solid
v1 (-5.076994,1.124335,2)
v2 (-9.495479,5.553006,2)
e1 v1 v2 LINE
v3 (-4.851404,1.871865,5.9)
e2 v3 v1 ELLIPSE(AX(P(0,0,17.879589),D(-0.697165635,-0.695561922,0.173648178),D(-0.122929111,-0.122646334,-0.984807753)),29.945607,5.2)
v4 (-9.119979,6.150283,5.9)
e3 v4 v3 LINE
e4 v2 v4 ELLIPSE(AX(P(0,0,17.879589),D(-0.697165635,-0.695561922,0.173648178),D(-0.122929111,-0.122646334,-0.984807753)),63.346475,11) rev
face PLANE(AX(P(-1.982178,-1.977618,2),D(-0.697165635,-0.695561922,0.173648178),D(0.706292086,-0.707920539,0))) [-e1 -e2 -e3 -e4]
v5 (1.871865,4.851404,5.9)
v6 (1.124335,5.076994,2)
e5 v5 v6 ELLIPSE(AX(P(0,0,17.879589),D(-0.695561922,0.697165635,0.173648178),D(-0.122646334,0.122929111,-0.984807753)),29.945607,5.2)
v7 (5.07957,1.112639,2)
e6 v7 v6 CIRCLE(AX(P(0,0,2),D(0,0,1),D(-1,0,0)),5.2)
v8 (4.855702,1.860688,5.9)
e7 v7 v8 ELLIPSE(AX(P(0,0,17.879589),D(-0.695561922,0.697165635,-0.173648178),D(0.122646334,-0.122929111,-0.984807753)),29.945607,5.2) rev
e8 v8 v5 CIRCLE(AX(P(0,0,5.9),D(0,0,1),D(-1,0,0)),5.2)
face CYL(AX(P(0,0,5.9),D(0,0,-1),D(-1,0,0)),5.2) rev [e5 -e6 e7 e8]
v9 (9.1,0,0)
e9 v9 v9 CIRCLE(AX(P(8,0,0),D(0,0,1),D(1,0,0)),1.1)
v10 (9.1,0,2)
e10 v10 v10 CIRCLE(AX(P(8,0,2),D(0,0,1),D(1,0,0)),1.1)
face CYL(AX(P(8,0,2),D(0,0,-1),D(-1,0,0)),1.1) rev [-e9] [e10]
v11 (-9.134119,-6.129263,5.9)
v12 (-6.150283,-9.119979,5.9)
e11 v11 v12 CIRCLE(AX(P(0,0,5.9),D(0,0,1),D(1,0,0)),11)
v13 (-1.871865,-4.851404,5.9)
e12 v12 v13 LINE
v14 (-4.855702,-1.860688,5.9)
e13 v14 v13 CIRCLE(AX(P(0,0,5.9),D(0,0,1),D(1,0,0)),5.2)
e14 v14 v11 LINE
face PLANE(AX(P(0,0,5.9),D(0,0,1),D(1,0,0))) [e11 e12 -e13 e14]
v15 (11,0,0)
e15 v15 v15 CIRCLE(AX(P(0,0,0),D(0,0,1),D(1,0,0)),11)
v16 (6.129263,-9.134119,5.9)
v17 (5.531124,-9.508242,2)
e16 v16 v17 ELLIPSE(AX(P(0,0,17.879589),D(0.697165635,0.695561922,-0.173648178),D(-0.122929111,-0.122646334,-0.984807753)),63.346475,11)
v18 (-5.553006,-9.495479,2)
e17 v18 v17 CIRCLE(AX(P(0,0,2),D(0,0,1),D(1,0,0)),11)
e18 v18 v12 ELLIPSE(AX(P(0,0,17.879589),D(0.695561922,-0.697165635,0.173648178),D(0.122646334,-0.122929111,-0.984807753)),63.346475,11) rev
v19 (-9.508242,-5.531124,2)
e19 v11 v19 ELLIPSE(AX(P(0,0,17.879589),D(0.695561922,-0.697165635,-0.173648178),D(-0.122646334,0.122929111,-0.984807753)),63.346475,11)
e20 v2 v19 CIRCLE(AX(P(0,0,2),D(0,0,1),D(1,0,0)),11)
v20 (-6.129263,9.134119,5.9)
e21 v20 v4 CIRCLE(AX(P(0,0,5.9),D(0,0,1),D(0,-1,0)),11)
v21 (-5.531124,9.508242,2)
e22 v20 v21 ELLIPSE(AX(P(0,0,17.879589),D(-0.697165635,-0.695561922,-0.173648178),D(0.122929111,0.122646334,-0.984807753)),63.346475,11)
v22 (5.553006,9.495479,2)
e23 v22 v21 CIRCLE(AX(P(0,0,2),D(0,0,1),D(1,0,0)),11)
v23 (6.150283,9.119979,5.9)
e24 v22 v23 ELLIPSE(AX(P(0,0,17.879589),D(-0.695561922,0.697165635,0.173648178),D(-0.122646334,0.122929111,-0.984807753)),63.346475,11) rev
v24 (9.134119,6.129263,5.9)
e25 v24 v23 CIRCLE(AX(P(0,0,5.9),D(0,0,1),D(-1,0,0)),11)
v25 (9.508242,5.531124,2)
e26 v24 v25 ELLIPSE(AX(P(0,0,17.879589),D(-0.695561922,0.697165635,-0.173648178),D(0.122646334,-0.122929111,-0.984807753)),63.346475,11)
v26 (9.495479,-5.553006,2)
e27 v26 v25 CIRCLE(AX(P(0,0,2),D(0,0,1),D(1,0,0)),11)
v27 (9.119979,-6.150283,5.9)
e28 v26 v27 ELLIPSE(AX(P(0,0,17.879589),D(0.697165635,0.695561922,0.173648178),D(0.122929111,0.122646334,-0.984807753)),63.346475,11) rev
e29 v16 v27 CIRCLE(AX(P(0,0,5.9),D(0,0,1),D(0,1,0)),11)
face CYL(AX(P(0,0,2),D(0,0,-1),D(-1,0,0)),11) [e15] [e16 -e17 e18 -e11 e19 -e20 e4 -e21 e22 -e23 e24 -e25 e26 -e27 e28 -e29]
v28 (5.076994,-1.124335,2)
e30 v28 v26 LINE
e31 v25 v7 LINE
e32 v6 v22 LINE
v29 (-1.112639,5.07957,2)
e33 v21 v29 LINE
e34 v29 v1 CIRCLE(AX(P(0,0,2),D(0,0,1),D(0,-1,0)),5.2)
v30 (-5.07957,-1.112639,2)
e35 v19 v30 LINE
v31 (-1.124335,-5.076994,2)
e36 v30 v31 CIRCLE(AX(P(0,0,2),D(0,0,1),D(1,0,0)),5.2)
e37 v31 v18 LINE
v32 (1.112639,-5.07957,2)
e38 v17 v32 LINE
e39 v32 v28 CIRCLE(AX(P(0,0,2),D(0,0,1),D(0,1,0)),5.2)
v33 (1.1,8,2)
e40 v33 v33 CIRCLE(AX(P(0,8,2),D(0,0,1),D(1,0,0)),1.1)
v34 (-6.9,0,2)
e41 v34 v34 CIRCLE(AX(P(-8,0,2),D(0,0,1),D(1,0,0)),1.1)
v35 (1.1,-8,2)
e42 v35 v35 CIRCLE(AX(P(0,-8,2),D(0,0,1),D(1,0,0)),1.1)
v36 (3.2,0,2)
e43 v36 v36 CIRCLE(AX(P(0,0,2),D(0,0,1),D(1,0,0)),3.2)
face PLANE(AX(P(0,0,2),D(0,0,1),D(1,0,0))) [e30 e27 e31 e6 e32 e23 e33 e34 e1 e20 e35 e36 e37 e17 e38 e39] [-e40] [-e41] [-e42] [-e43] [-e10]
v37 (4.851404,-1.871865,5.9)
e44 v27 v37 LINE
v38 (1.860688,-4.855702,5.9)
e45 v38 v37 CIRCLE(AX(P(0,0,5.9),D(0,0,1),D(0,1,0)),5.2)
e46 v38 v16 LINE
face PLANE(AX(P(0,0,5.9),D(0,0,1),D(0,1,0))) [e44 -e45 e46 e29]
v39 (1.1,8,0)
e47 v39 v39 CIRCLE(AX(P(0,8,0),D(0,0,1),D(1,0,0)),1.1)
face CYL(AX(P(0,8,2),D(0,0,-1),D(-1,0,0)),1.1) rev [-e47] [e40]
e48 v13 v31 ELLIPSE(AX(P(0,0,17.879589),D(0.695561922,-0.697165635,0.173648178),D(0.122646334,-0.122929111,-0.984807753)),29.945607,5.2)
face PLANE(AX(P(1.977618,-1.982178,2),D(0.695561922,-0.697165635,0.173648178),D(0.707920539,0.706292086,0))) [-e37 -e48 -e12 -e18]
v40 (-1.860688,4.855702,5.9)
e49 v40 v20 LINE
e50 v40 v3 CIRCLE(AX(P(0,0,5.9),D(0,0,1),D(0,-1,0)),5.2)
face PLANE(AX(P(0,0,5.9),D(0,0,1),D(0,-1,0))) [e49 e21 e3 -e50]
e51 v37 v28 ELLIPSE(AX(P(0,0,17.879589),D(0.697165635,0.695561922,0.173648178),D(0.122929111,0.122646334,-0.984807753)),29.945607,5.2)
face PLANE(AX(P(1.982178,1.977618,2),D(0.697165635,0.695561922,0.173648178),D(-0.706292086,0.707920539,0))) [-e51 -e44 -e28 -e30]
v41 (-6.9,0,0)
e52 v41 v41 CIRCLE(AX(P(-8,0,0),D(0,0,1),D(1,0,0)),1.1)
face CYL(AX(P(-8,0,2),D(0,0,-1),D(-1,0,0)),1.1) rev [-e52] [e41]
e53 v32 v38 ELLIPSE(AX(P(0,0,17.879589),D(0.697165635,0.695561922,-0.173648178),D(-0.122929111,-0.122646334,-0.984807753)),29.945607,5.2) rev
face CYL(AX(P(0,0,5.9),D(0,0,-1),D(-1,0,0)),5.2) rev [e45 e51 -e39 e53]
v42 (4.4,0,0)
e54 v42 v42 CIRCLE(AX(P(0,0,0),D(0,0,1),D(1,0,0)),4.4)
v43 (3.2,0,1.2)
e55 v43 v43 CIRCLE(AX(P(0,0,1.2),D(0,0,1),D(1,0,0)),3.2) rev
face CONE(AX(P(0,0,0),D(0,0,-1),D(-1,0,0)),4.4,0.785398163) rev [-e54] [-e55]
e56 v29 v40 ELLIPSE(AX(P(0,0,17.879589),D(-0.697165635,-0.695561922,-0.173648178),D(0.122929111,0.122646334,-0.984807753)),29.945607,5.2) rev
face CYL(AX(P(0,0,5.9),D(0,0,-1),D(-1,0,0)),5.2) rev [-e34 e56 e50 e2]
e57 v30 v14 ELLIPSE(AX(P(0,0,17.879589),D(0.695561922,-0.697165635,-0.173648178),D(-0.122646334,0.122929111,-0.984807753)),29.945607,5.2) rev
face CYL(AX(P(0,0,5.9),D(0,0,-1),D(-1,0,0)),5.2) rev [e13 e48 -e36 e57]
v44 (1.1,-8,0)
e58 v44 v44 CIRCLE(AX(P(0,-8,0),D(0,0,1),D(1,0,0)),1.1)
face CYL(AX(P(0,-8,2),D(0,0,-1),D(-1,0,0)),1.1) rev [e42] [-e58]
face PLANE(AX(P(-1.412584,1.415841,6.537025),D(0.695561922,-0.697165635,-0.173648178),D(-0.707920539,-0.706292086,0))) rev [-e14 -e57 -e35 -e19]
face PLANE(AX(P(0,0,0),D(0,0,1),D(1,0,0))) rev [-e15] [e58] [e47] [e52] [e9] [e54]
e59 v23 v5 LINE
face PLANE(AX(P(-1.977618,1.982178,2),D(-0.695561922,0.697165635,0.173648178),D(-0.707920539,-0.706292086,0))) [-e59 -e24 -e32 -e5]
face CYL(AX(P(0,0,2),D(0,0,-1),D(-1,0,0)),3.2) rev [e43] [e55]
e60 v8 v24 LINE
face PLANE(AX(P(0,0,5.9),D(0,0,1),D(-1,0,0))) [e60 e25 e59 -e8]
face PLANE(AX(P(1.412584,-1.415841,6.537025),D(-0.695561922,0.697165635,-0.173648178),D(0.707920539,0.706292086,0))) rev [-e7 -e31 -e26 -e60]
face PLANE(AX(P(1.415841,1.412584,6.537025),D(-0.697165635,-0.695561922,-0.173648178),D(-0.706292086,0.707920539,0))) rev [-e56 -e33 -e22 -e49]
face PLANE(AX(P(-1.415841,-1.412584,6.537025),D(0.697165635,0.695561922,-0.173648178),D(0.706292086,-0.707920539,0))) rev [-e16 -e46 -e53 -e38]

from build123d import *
from build123d.topology import SkipClean

# Parameters (mm, degrees)
SZKIC1_R                    = 11
SZKIC1_R_2                  = 1.1
SZKIC1_R_3                  = 3.2
DODANIE_WYCI_GNI_CIE1_DEPTH = 2
SFAZOWANIE1_SIZE            = 1.2
DODANIE_WYCI_GNI_CIE2_DEPTH = 3.9
SZYK_KO_OWY1_COUNT          = 4


with BuildPart() as part:
    # Szkic1 → Dodanie-wyciągnięcie1 (new body)
    with BuildSketch(Plane.XY):
        Circle(SZKIC1_R)
        with Locations((0, 8)):
            Circle(SZKIC1_R_2, mode=Mode.SUBTRACT)
        with Locations((8, 0)):
            Circle(SZKIC1_R_2, mode=Mode.SUBTRACT)
        with Locations((0, -8)):
            Circle(SZKIC1_R_2, mode=Mode.SUBTRACT)
        with Locations((-8, 0)):
            Circle(SZKIC1_R_2, mode=Mode.SUBTRACT)
        Circle(SZKIC1_R_3, mode=Mode.SUBTRACT)
    extrude(amount=DODANIE_WYCI_GNI_CIE1_DEPTH)

    # Sfazowanie1
    sfazowanie1_edges = [part.edges().sort_by_distance(p)[0] for p in [
        (-3.2, 0, 0),
    ]]
    chamfer(sfazowanie1_edges, length=SFAZOWANIE1_SIZE)

    # Szkic2 → Dodanie-wyciągnięcie2 (add)
    with BuildSketch(Plane.XY.offset(2)):
        with BuildLine():
            ThreePointArc((-1.985434, -4.806043), (-3.681187, -3.672719), (-4.810603, -1.974361))
            Line((-4.810603, -1.974361), (-9.069916, -6.223876))
            ThreePointArc((-9.069916, -6.223876), (-7.787126, -7.769213), (-6.244747, -9.055558))
            Line((-6.244747, -9.055558), (-1.985434, -4.806043))
        make_face()
    dodanie_wyci_gni_cie2 = extrude(amount=DODANIE_WYCI_GNI_CIE2_DEPTH)

    # Sfazowanie2
    # the kernel refuses this chamfer: 4.537025, 0.8 mm, written as the material it adds along each edge
    with BuildSketch(Plane(origin=(-9.583198, -12.386329, 2), x_dir=(0.6905216935845088, -0.6921137853794768, -0.21013876076743532), z_dir=(0.7079205386909484, 0.7062920861085148, 0))) as sfazowanie2_piece_1_section:
        with BuildLine():
            Line((0.850504, 0), (-1.021772, -4.603832))
            Line((-1.021772, -4.603832), (-1.110486, -4.584764))
            ThreePointArc((-1.110486, -4.584764), (-0.584195, -2.286159), (-0.088714, 0.019068))
            Line((-0.088714, 0.019068), (0.019068, 0.088714))
            ThreePointArc((0.019068, 0.088714), (0.425542, 0.001348), (0.869572, 0.088714))
            Line((0.869572, 0.088714), (0.850504, 0))
        make_face()
    sfazowanie2_piece_1 = extrude(amount=15.448363, mode=Mode.PRIVATE)
    sfazowanie2_piece_1 = sfazowanie2_piece_1 & Plane(origin=(0, 0, 3.473848), x_dir=(1, 0, 0), z_dir=(0, 0, -1)) * Cylinder(11, 50, mode=Mode.PRIVATE)
    sfazowanie2_piece_1 = sfazowanie2_piece_1 - Plane(origin=(0, 0, 3.473848), x_dir=(-0.38181431028836865, -0.9242390559043788, 0), z_dir=(0, 0, -1)) * Cylinder(5.2, 50, mode=Mode.PRIVATE)
    sfazowanie2_piece_1 = split(sfazowanie2_piece_1, bisect_by=Plane(origin=(-3.895318, -7.039482, 5.9), z_dir=(0, 0, -1)), keep=Keep.TOP, mode=Mode.PRIVATE)
    add(sfazowanie2_piece_1)
    with BuildSketch(Plane(origin=(-1.472152, 1.35641, 2), x_dir=(-0.690521693584509, 0.6921137853794764, -0.21013876076743535), z_dir=(-0.7079205386909481, -0.706292086108515, 0))) as sfazowanie2_piece_2_section:
        with BuildLine():
            Line((0.850504, 0), (-1.021772, -4.603832))
            Line((-1.021772, -4.603832), (-1.110486, -4.584764))
            ThreePointArc((-1.110486, -4.584764), (-0.584195, -2.286159), (-0.088714, 0.019068))
            Line((-0.088714, 0.019068), (0.019068, 0.088714))
            ThreePointArc((0.019068, 0.088714), (0.425542, 0.001348), (0.869572, 0.088714))
            Line((0.869572, 0.088714), (0.850504, 0))
        make_face()
    sfazowanie2_piece_2 = extrude(amount=15.448363, mode=Mode.PRIVATE)
    sfazowanie2_piece_2 = sfazowanie2_piece_2 - Plane(origin=(0, 0, 3.473848), x_dir=(-0.38181431028836865, -0.9242390559043788, 0), z_dir=(0, 0, -1)) * Cylinder(5.2, 50, mode=Mode.PRIVATE)
    sfazowanie2_piece_2 = sfazowanie2_piece_2 & Plane(origin=(0, 0, 3.473848), x_dir=(1, 0, 0), z_dir=(0, 0, -1)) * Cylinder(11, 50, mode=Mode.PRIVATE)
    sfazowanie2_piece_2 = split(sfazowanie2_piece_2, bisect_by=Plane(origin=(-7.048434, -3.879096, 5.9), z_dir=(0, 0, -1)), keep=Keep.TOP, mode=Mode.PRIVATE)
    add(sfazowanie2_piece_2)

    # Szyk kołowy1: Dodanie-wyciągnięcie2 ×4 about axis
    with SkipClean():  # the faces are left unmerged after this step: merging them gives an invalid solid
        szyk_ko_owy1_axis = Axis((0, 0, 0), (0, 0, 1))
        for i in range(1, SZYK_KO_OWY1_COUNT):
            add(dodanie_wyci_gni_cie2.rotate(szyk_ko_owy1_axis, i * 360 / SZYK_KO_OWY1_COUNT))

    # Sfazowanie2 of Szyk kołowy1
    # the kernel refuses this chamfer: 4.537025, 0.8 mm, written as the material it adds along each edge
    with BuildSketch(Plane(origin=(12.386329, -9.583198, 2), x_dir=(0.6921137853794768, 0.6905216935845088, -0.21013876076743532), z_dir=(-0.7062920861085147, 0.7079205386909485, 0))) as sfazowanie2_of_szyk_ko_owy1_piece_1_section:
        with BuildLine():
            Line((0.850504, 0), (-1.021772, -4.603832))
            Line((-1.021772, -4.603832), (-1.110486, -4.584764))
            ThreePointArc((-1.110486, -4.584764), (-0.584195, -2.286159), (-0.088714, 0.019068))
            Line((-0.088714, 0.019068), (0.019068, 0.088714))
            ThreePointArc((0.019068, 0.088714), (0.425542, 0.001348), (0.869572, 0.088714))
            Line((0.869572, 0.088714), (0.850504, 0))
        make_face()
    sfazowanie2_of_szyk_ko_owy1_piece_1 = extrude(amount=15.448363, mode=Mode.PRIVATE)
    sfazowanie2_of_szyk_ko_owy1_piece_1 = sfazowanie2_of_szyk_ko_owy1_piece_1 & Plane(origin=(0, 0, 3.473848), x_dir=(1, 0, 0), z_dir=(0, 0, -1)) * Cylinder(11, 50, mode=Mode.PRIVATE)
    sfazowanie2_of_szyk_ko_owy1_piece_1 = sfazowanie2_of_szyk_ko_owy1_piece_1 - Plane(origin=(0, 0, 3.473848), x_dir=(0.9242390559043788, -0.38181431028836876, 0), z_dir=(0, 0, -1)) * Cylinder(5.2, 50, mode=Mode.PRIVATE)
    sfazowanie2_of_szyk_ko_owy1_piece_1 = split(sfazowanie2_of_szyk_ko_owy1_piece_1, bisect_by=Plane(origin=(7.039482, -3.895318, 5.9), z_dir=(0, 0, -1)), keep=Keep.TOP, mode=Mode.PRIVATE)
    add(sfazowanie2_of_szyk_ko_owy1_piece_1)
    with BuildSketch(Plane(origin=(-1.35641, -1.472152, 2), x_dir=(-0.6921137853794764, -0.690521693584509, -0.21013876076743537), z_dir=(0.7062920861085149, -0.7079205386909482, 0))) as sfazowanie2_of_szyk_ko_owy1_piece_2_section:
        with BuildLine():
            Line((0.850504, 0), (-1.021772, -4.603832))
            Line((-1.021772, -4.603832), (-1.110486, -4.584764))
            ThreePointArc((-1.110486, -4.584764), (-0.584195, -2.286159), (-0.088714, 0.019068))
            Line((-0.088714, 0.019068), (0.019068, 0.088714))
            ThreePointArc((0.019068, 0.088714), (0.425542, 0.001348), (0.869572, 0.088714))
            Line((0.869572, 0.088714), (0.850504, 0))
        make_face()
    sfazowanie2_of_szyk_ko_owy1_piece_2 = extrude(amount=15.448363, mode=Mode.PRIVATE)
    sfazowanie2_of_szyk_ko_owy1_piece_2 = sfazowanie2_of_szyk_ko_owy1_piece_2 - Plane(origin=(0, 0, 3.473848), x_dir=(0.9242390559043788, -0.38181431028836876, 0), z_dir=(0, 0, -1)) * Cylinder(5.2, 50, mode=Mode.PRIVATE)
    sfazowanie2_of_szyk_ko_owy1_piece_2 = sfazowanie2_of_szyk_ko_owy1_piece_2 & Plane(origin=(0, 0, 3.473848), x_dir=(1, 0, 0), z_dir=(0, 0, -1)) * Cylinder(11, 50, mode=Mode.PRIVATE)
    sfazowanie2_of_szyk_ko_owy1_piece_2 = split(sfazowanie2_of_szyk_ko_owy1_piece_2, bisect_by=Plane(origin=(3.879096, -7.048434, 5.9), z_dir=(0, 0, -1)), keep=Keep.TOP, mode=Mode.PRIVATE)
    add(sfazowanie2_of_szyk_ko_owy1_piece_2)
    with BuildSketch(Plane(origin=(9.583198, 12.386329, 2), x_dir=(-0.6905216935845088, 0.6921137853794768, -0.21013876076743532), z_dir=(-0.7079205386909485, -0.7062920861085147, 0))) as sfazowanie2_of_szyk_ko_owy1_piece_3_section:
        with BuildLine():
            Line((0.850504, 0), (-1.021772, -4.603832))
            Line((-1.021772, -4.603832), (-1.110486, -4.584764))
            ThreePointArc((-1.110486, -4.584764), (-0.584195, -2.286159), (-0.088714, 0.019068))
            Line((-0.088714, 0.019068), (0.019068, 0.088714))
            ThreePointArc((0.019068, 0.088714), (0.425542, 0.001348), (0.869572, 0.088714))
            Line((0.869572, 0.088714), (0.850504, 0))
        make_face()
    sfazowanie2_of_szyk_ko_owy1_piece_3 = extrude(amount=15.448363, mode=Mode.PRIVATE)
    sfazowanie2_of_szyk_ko_owy1_piece_3 = sfazowanie2_of_szyk_ko_owy1_piece_3 & Plane(origin=(0, 0, 3.473848), x_dir=(1, 0, 0), z_dir=(0, 0, -1)) * Cylinder(11, 50, mode=Mode.PRIVATE)
    sfazowanie2_of_szyk_ko_owy1_piece_3 = sfazowanie2_of_szyk_ko_owy1_piece_3 - Plane(origin=(0, 0, 3.473848), x_dir=(0.38181431028836876, 0.9242390559043788, 0), z_dir=(0, 0, -1)) * Cylinder(5.2, 50, mode=Mode.PRIVATE)
    sfazowanie2_of_szyk_ko_owy1_piece_3 = split(sfazowanie2_of_szyk_ko_owy1_piece_3, bisect_by=Plane(origin=(3.895318, 7.039482, 5.9), z_dir=(0, 0, -1)), keep=Keep.TOP, mode=Mode.PRIVATE)
    add(sfazowanie2_of_szyk_ko_owy1_piece_3)
    with BuildSketch(Plane(origin=(1.472152, -1.35641, 2), x_dir=(0.6905216935845091, -0.6921137853794765, -0.21013876076743537), z_dir=(0.7079205386909482, 0.7062920861085149, 0))) as sfazowanie2_of_szyk_ko_owy1_piece_4_section:
        with BuildLine():
            Line((0.850504, 0), (-1.021772, -4.603832))
            Line((-1.021772, -4.603832), (-1.110486, -4.584764))
            ThreePointArc((-1.110486, -4.584764), (-0.584195, -2.286159), (-0.088714, 0.019068))
            Line((-0.088714, 0.019068), (0.019068, 0.088714))
            ThreePointArc((0.019068, 0.088714), (0.425542, 0.001348), (0.869572, 0.088714))
            Line((0.869572, 0.088714), (0.850504, 0))
        make_face()
    sfazowanie2_of_szyk_ko_owy1_piece_4 = extrude(amount=15.448363, mode=Mode.PRIVATE)
    sfazowanie2_of_szyk_ko_owy1_piece_4 = sfazowanie2_of_szyk_ko_owy1_piece_4 - Plane(origin=(0, 0, 3.473848), x_dir=(0.38181431028836876, 0.9242390559043788, 0), z_dir=(0, 0, -1)) * Cylinder(5.2, 50, mode=Mode.PRIVATE)
    sfazowanie2_of_szyk_ko_owy1_piece_4 = sfazowanie2_of_szyk_ko_owy1_piece_4 & Plane(origin=(0, 0, 3.473848), x_dir=(1, 0, 0), z_dir=(0, 0, -1)) * Cylinder(11, 50, mode=Mode.PRIVATE)
    sfazowanie2_of_szyk_ko_owy1_piece_4 = split(sfazowanie2_of_szyk_ko_owy1_piece_4, bisect_by=Plane(origin=(7.048434, 3.879096, 5.9), z_dir=(0, 0, -1)), keep=Keep.TOP, mode=Mode.PRIVATE)
    add(sfazowanie2_of_szyk_ko_owy1_piece_4)
    with BuildSketch(Plane(origin=(-12.386329, 9.583198, 2), x_dir=(-0.6921137853794768, -0.6905216935845088, -0.21013876076743532), z_dir=(0.7062920861085147, -0.7079205386909485, 0))) as sfazowanie2_of_szyk_ko_owy1_piece_5_section:
        with BuildLine():
            Line((0.850504, 0), (-1.021772, -4.603832))
            Line((-1.021772, -4.603832), (-1.110486, -4.584764))
            ThreePointArc((-1.110486, -4.584764), (-0.584195, -2.286159), (-0.088714, 0.019068))
            Line((-0.088714, 0.019068), (0.019068, 0.088714))
            ThreePointArc((0.019068, 0.088714), (0.425542, 0.001348), (0.869572, 0.088714))
            Line((0.869572, 0.088714), (0.850504, 0))
        make_face()
    sfazowanie2_of_szyk_ko_owy1_piece_5 = extrude(amount=15.448363, mode=Mode.PRIVATE)
    sfazowanie2_of_szyk_ko_owy1_piece_5 = sfazowanie2_of_szyk_ko_owy1_piece_5 & Plane(origin=(0, 0, 3.473848), x_dir=(1, 0, 0), z_dir=(0, 0, -1)) * Cylinder(11, 50, mode=Mode.PRIVATE)
    sfazowanie2_of_szyk_ko_owy1_piece_5 = sfazowanie2_of_szyk_ko_owy1_piece_5 - Plane(origin=(0, 0, 3.473848), x_dir=(-0.9242390559043787, 0.3818143102883689, 0), z_dir=(0, 0, -1)) * Cylinder(5.2, 50, mode=Mode.PRIVATE)
    sfazowanie2_of_szyk_ko_owy1_piece_5 = split(sfazowanie2_of_szyk_ko_owy1_piece_5, bisect_by=Plane(origin=(-7.039482, 3.895318, 5.9), z_dir=(0, 0, -1)), keep=Keep.TOP, mode=Mode.PRIVATE)
    add(sfazowanie2_of_szyk_ko_owy1_piece_5)
    with BuildSketch(Plane(origin=(1.35641, 1.472152, 2), x_dir=(0.6921137853794764, 0.690521693584509, -0.21013876076743535), z_dir=(-0.7062920861085149, 0.7079205386909482, 0))) as sfazowanie2_of_szyk_ko_owy1_piece_6_section:
        with BuildLine():
            Line((0.850504, 0), (-1.021772, -4.603832))
            Line((-1.021772, -4.603832), (-1.110486, -4.584764))
            ThreePointArc((-1.110486, -4.584764), (-0.584195, -2.286159), (-0.088714, 0.019068))
            Line((-0.088714, 0.019068), (0.019068, 0.088714))
            ThreePointArc((0.019068, 0.088714), (0.425542, 0.001348), (0.869572, 0.088714))
            Line((0.869572, 0.088714), (0.850504, 0))
        make_face()
    sfazowanie2_of_szyk_ko_owy1_piece_6 = extrude(amount=15.448363, mode=Mode.PRIVATE)
    sfazowanie2_of_szyk_ko_owy1_piece_6 = sfazowanie2_of_szyk_ko_owy1_piece_6 - Plane(origin=(0, 0, 3.473848), x_dir=(-0.9242390559043787, 0.3818143102883689, 0), z_dir=(0, 0, -1)) * Cylinder(5.2, 50, mode=Mode.PRIVATE)
    sfazowanie2_of_szyk_ko_owy1_piece_6 = sfazowanie2_of_szyk_ko_owy1_piece_6 & Plane(origin=(0, 0, 3.473848), x_dir=(1, 0, 0), z_dir=(0, 0, -1)) * Cylinder(11, 50, mode=Mode.PRIVATE)
    sfazowanie2_of_szyk_ko_owy1_piece_6 = split(sfazowanie2_of_szyk_ko_owy1_piece_6, bisect_by=Plane(origin=(-3.879096, 7.048434, 5.9), z_dir=(0, 0, -1)), keep=Keep.TOP, mode=Mode.PRIVATE)
    add(sfazowanie2_of_szyk_ko_owy1_piece_6)


solid = part.part
